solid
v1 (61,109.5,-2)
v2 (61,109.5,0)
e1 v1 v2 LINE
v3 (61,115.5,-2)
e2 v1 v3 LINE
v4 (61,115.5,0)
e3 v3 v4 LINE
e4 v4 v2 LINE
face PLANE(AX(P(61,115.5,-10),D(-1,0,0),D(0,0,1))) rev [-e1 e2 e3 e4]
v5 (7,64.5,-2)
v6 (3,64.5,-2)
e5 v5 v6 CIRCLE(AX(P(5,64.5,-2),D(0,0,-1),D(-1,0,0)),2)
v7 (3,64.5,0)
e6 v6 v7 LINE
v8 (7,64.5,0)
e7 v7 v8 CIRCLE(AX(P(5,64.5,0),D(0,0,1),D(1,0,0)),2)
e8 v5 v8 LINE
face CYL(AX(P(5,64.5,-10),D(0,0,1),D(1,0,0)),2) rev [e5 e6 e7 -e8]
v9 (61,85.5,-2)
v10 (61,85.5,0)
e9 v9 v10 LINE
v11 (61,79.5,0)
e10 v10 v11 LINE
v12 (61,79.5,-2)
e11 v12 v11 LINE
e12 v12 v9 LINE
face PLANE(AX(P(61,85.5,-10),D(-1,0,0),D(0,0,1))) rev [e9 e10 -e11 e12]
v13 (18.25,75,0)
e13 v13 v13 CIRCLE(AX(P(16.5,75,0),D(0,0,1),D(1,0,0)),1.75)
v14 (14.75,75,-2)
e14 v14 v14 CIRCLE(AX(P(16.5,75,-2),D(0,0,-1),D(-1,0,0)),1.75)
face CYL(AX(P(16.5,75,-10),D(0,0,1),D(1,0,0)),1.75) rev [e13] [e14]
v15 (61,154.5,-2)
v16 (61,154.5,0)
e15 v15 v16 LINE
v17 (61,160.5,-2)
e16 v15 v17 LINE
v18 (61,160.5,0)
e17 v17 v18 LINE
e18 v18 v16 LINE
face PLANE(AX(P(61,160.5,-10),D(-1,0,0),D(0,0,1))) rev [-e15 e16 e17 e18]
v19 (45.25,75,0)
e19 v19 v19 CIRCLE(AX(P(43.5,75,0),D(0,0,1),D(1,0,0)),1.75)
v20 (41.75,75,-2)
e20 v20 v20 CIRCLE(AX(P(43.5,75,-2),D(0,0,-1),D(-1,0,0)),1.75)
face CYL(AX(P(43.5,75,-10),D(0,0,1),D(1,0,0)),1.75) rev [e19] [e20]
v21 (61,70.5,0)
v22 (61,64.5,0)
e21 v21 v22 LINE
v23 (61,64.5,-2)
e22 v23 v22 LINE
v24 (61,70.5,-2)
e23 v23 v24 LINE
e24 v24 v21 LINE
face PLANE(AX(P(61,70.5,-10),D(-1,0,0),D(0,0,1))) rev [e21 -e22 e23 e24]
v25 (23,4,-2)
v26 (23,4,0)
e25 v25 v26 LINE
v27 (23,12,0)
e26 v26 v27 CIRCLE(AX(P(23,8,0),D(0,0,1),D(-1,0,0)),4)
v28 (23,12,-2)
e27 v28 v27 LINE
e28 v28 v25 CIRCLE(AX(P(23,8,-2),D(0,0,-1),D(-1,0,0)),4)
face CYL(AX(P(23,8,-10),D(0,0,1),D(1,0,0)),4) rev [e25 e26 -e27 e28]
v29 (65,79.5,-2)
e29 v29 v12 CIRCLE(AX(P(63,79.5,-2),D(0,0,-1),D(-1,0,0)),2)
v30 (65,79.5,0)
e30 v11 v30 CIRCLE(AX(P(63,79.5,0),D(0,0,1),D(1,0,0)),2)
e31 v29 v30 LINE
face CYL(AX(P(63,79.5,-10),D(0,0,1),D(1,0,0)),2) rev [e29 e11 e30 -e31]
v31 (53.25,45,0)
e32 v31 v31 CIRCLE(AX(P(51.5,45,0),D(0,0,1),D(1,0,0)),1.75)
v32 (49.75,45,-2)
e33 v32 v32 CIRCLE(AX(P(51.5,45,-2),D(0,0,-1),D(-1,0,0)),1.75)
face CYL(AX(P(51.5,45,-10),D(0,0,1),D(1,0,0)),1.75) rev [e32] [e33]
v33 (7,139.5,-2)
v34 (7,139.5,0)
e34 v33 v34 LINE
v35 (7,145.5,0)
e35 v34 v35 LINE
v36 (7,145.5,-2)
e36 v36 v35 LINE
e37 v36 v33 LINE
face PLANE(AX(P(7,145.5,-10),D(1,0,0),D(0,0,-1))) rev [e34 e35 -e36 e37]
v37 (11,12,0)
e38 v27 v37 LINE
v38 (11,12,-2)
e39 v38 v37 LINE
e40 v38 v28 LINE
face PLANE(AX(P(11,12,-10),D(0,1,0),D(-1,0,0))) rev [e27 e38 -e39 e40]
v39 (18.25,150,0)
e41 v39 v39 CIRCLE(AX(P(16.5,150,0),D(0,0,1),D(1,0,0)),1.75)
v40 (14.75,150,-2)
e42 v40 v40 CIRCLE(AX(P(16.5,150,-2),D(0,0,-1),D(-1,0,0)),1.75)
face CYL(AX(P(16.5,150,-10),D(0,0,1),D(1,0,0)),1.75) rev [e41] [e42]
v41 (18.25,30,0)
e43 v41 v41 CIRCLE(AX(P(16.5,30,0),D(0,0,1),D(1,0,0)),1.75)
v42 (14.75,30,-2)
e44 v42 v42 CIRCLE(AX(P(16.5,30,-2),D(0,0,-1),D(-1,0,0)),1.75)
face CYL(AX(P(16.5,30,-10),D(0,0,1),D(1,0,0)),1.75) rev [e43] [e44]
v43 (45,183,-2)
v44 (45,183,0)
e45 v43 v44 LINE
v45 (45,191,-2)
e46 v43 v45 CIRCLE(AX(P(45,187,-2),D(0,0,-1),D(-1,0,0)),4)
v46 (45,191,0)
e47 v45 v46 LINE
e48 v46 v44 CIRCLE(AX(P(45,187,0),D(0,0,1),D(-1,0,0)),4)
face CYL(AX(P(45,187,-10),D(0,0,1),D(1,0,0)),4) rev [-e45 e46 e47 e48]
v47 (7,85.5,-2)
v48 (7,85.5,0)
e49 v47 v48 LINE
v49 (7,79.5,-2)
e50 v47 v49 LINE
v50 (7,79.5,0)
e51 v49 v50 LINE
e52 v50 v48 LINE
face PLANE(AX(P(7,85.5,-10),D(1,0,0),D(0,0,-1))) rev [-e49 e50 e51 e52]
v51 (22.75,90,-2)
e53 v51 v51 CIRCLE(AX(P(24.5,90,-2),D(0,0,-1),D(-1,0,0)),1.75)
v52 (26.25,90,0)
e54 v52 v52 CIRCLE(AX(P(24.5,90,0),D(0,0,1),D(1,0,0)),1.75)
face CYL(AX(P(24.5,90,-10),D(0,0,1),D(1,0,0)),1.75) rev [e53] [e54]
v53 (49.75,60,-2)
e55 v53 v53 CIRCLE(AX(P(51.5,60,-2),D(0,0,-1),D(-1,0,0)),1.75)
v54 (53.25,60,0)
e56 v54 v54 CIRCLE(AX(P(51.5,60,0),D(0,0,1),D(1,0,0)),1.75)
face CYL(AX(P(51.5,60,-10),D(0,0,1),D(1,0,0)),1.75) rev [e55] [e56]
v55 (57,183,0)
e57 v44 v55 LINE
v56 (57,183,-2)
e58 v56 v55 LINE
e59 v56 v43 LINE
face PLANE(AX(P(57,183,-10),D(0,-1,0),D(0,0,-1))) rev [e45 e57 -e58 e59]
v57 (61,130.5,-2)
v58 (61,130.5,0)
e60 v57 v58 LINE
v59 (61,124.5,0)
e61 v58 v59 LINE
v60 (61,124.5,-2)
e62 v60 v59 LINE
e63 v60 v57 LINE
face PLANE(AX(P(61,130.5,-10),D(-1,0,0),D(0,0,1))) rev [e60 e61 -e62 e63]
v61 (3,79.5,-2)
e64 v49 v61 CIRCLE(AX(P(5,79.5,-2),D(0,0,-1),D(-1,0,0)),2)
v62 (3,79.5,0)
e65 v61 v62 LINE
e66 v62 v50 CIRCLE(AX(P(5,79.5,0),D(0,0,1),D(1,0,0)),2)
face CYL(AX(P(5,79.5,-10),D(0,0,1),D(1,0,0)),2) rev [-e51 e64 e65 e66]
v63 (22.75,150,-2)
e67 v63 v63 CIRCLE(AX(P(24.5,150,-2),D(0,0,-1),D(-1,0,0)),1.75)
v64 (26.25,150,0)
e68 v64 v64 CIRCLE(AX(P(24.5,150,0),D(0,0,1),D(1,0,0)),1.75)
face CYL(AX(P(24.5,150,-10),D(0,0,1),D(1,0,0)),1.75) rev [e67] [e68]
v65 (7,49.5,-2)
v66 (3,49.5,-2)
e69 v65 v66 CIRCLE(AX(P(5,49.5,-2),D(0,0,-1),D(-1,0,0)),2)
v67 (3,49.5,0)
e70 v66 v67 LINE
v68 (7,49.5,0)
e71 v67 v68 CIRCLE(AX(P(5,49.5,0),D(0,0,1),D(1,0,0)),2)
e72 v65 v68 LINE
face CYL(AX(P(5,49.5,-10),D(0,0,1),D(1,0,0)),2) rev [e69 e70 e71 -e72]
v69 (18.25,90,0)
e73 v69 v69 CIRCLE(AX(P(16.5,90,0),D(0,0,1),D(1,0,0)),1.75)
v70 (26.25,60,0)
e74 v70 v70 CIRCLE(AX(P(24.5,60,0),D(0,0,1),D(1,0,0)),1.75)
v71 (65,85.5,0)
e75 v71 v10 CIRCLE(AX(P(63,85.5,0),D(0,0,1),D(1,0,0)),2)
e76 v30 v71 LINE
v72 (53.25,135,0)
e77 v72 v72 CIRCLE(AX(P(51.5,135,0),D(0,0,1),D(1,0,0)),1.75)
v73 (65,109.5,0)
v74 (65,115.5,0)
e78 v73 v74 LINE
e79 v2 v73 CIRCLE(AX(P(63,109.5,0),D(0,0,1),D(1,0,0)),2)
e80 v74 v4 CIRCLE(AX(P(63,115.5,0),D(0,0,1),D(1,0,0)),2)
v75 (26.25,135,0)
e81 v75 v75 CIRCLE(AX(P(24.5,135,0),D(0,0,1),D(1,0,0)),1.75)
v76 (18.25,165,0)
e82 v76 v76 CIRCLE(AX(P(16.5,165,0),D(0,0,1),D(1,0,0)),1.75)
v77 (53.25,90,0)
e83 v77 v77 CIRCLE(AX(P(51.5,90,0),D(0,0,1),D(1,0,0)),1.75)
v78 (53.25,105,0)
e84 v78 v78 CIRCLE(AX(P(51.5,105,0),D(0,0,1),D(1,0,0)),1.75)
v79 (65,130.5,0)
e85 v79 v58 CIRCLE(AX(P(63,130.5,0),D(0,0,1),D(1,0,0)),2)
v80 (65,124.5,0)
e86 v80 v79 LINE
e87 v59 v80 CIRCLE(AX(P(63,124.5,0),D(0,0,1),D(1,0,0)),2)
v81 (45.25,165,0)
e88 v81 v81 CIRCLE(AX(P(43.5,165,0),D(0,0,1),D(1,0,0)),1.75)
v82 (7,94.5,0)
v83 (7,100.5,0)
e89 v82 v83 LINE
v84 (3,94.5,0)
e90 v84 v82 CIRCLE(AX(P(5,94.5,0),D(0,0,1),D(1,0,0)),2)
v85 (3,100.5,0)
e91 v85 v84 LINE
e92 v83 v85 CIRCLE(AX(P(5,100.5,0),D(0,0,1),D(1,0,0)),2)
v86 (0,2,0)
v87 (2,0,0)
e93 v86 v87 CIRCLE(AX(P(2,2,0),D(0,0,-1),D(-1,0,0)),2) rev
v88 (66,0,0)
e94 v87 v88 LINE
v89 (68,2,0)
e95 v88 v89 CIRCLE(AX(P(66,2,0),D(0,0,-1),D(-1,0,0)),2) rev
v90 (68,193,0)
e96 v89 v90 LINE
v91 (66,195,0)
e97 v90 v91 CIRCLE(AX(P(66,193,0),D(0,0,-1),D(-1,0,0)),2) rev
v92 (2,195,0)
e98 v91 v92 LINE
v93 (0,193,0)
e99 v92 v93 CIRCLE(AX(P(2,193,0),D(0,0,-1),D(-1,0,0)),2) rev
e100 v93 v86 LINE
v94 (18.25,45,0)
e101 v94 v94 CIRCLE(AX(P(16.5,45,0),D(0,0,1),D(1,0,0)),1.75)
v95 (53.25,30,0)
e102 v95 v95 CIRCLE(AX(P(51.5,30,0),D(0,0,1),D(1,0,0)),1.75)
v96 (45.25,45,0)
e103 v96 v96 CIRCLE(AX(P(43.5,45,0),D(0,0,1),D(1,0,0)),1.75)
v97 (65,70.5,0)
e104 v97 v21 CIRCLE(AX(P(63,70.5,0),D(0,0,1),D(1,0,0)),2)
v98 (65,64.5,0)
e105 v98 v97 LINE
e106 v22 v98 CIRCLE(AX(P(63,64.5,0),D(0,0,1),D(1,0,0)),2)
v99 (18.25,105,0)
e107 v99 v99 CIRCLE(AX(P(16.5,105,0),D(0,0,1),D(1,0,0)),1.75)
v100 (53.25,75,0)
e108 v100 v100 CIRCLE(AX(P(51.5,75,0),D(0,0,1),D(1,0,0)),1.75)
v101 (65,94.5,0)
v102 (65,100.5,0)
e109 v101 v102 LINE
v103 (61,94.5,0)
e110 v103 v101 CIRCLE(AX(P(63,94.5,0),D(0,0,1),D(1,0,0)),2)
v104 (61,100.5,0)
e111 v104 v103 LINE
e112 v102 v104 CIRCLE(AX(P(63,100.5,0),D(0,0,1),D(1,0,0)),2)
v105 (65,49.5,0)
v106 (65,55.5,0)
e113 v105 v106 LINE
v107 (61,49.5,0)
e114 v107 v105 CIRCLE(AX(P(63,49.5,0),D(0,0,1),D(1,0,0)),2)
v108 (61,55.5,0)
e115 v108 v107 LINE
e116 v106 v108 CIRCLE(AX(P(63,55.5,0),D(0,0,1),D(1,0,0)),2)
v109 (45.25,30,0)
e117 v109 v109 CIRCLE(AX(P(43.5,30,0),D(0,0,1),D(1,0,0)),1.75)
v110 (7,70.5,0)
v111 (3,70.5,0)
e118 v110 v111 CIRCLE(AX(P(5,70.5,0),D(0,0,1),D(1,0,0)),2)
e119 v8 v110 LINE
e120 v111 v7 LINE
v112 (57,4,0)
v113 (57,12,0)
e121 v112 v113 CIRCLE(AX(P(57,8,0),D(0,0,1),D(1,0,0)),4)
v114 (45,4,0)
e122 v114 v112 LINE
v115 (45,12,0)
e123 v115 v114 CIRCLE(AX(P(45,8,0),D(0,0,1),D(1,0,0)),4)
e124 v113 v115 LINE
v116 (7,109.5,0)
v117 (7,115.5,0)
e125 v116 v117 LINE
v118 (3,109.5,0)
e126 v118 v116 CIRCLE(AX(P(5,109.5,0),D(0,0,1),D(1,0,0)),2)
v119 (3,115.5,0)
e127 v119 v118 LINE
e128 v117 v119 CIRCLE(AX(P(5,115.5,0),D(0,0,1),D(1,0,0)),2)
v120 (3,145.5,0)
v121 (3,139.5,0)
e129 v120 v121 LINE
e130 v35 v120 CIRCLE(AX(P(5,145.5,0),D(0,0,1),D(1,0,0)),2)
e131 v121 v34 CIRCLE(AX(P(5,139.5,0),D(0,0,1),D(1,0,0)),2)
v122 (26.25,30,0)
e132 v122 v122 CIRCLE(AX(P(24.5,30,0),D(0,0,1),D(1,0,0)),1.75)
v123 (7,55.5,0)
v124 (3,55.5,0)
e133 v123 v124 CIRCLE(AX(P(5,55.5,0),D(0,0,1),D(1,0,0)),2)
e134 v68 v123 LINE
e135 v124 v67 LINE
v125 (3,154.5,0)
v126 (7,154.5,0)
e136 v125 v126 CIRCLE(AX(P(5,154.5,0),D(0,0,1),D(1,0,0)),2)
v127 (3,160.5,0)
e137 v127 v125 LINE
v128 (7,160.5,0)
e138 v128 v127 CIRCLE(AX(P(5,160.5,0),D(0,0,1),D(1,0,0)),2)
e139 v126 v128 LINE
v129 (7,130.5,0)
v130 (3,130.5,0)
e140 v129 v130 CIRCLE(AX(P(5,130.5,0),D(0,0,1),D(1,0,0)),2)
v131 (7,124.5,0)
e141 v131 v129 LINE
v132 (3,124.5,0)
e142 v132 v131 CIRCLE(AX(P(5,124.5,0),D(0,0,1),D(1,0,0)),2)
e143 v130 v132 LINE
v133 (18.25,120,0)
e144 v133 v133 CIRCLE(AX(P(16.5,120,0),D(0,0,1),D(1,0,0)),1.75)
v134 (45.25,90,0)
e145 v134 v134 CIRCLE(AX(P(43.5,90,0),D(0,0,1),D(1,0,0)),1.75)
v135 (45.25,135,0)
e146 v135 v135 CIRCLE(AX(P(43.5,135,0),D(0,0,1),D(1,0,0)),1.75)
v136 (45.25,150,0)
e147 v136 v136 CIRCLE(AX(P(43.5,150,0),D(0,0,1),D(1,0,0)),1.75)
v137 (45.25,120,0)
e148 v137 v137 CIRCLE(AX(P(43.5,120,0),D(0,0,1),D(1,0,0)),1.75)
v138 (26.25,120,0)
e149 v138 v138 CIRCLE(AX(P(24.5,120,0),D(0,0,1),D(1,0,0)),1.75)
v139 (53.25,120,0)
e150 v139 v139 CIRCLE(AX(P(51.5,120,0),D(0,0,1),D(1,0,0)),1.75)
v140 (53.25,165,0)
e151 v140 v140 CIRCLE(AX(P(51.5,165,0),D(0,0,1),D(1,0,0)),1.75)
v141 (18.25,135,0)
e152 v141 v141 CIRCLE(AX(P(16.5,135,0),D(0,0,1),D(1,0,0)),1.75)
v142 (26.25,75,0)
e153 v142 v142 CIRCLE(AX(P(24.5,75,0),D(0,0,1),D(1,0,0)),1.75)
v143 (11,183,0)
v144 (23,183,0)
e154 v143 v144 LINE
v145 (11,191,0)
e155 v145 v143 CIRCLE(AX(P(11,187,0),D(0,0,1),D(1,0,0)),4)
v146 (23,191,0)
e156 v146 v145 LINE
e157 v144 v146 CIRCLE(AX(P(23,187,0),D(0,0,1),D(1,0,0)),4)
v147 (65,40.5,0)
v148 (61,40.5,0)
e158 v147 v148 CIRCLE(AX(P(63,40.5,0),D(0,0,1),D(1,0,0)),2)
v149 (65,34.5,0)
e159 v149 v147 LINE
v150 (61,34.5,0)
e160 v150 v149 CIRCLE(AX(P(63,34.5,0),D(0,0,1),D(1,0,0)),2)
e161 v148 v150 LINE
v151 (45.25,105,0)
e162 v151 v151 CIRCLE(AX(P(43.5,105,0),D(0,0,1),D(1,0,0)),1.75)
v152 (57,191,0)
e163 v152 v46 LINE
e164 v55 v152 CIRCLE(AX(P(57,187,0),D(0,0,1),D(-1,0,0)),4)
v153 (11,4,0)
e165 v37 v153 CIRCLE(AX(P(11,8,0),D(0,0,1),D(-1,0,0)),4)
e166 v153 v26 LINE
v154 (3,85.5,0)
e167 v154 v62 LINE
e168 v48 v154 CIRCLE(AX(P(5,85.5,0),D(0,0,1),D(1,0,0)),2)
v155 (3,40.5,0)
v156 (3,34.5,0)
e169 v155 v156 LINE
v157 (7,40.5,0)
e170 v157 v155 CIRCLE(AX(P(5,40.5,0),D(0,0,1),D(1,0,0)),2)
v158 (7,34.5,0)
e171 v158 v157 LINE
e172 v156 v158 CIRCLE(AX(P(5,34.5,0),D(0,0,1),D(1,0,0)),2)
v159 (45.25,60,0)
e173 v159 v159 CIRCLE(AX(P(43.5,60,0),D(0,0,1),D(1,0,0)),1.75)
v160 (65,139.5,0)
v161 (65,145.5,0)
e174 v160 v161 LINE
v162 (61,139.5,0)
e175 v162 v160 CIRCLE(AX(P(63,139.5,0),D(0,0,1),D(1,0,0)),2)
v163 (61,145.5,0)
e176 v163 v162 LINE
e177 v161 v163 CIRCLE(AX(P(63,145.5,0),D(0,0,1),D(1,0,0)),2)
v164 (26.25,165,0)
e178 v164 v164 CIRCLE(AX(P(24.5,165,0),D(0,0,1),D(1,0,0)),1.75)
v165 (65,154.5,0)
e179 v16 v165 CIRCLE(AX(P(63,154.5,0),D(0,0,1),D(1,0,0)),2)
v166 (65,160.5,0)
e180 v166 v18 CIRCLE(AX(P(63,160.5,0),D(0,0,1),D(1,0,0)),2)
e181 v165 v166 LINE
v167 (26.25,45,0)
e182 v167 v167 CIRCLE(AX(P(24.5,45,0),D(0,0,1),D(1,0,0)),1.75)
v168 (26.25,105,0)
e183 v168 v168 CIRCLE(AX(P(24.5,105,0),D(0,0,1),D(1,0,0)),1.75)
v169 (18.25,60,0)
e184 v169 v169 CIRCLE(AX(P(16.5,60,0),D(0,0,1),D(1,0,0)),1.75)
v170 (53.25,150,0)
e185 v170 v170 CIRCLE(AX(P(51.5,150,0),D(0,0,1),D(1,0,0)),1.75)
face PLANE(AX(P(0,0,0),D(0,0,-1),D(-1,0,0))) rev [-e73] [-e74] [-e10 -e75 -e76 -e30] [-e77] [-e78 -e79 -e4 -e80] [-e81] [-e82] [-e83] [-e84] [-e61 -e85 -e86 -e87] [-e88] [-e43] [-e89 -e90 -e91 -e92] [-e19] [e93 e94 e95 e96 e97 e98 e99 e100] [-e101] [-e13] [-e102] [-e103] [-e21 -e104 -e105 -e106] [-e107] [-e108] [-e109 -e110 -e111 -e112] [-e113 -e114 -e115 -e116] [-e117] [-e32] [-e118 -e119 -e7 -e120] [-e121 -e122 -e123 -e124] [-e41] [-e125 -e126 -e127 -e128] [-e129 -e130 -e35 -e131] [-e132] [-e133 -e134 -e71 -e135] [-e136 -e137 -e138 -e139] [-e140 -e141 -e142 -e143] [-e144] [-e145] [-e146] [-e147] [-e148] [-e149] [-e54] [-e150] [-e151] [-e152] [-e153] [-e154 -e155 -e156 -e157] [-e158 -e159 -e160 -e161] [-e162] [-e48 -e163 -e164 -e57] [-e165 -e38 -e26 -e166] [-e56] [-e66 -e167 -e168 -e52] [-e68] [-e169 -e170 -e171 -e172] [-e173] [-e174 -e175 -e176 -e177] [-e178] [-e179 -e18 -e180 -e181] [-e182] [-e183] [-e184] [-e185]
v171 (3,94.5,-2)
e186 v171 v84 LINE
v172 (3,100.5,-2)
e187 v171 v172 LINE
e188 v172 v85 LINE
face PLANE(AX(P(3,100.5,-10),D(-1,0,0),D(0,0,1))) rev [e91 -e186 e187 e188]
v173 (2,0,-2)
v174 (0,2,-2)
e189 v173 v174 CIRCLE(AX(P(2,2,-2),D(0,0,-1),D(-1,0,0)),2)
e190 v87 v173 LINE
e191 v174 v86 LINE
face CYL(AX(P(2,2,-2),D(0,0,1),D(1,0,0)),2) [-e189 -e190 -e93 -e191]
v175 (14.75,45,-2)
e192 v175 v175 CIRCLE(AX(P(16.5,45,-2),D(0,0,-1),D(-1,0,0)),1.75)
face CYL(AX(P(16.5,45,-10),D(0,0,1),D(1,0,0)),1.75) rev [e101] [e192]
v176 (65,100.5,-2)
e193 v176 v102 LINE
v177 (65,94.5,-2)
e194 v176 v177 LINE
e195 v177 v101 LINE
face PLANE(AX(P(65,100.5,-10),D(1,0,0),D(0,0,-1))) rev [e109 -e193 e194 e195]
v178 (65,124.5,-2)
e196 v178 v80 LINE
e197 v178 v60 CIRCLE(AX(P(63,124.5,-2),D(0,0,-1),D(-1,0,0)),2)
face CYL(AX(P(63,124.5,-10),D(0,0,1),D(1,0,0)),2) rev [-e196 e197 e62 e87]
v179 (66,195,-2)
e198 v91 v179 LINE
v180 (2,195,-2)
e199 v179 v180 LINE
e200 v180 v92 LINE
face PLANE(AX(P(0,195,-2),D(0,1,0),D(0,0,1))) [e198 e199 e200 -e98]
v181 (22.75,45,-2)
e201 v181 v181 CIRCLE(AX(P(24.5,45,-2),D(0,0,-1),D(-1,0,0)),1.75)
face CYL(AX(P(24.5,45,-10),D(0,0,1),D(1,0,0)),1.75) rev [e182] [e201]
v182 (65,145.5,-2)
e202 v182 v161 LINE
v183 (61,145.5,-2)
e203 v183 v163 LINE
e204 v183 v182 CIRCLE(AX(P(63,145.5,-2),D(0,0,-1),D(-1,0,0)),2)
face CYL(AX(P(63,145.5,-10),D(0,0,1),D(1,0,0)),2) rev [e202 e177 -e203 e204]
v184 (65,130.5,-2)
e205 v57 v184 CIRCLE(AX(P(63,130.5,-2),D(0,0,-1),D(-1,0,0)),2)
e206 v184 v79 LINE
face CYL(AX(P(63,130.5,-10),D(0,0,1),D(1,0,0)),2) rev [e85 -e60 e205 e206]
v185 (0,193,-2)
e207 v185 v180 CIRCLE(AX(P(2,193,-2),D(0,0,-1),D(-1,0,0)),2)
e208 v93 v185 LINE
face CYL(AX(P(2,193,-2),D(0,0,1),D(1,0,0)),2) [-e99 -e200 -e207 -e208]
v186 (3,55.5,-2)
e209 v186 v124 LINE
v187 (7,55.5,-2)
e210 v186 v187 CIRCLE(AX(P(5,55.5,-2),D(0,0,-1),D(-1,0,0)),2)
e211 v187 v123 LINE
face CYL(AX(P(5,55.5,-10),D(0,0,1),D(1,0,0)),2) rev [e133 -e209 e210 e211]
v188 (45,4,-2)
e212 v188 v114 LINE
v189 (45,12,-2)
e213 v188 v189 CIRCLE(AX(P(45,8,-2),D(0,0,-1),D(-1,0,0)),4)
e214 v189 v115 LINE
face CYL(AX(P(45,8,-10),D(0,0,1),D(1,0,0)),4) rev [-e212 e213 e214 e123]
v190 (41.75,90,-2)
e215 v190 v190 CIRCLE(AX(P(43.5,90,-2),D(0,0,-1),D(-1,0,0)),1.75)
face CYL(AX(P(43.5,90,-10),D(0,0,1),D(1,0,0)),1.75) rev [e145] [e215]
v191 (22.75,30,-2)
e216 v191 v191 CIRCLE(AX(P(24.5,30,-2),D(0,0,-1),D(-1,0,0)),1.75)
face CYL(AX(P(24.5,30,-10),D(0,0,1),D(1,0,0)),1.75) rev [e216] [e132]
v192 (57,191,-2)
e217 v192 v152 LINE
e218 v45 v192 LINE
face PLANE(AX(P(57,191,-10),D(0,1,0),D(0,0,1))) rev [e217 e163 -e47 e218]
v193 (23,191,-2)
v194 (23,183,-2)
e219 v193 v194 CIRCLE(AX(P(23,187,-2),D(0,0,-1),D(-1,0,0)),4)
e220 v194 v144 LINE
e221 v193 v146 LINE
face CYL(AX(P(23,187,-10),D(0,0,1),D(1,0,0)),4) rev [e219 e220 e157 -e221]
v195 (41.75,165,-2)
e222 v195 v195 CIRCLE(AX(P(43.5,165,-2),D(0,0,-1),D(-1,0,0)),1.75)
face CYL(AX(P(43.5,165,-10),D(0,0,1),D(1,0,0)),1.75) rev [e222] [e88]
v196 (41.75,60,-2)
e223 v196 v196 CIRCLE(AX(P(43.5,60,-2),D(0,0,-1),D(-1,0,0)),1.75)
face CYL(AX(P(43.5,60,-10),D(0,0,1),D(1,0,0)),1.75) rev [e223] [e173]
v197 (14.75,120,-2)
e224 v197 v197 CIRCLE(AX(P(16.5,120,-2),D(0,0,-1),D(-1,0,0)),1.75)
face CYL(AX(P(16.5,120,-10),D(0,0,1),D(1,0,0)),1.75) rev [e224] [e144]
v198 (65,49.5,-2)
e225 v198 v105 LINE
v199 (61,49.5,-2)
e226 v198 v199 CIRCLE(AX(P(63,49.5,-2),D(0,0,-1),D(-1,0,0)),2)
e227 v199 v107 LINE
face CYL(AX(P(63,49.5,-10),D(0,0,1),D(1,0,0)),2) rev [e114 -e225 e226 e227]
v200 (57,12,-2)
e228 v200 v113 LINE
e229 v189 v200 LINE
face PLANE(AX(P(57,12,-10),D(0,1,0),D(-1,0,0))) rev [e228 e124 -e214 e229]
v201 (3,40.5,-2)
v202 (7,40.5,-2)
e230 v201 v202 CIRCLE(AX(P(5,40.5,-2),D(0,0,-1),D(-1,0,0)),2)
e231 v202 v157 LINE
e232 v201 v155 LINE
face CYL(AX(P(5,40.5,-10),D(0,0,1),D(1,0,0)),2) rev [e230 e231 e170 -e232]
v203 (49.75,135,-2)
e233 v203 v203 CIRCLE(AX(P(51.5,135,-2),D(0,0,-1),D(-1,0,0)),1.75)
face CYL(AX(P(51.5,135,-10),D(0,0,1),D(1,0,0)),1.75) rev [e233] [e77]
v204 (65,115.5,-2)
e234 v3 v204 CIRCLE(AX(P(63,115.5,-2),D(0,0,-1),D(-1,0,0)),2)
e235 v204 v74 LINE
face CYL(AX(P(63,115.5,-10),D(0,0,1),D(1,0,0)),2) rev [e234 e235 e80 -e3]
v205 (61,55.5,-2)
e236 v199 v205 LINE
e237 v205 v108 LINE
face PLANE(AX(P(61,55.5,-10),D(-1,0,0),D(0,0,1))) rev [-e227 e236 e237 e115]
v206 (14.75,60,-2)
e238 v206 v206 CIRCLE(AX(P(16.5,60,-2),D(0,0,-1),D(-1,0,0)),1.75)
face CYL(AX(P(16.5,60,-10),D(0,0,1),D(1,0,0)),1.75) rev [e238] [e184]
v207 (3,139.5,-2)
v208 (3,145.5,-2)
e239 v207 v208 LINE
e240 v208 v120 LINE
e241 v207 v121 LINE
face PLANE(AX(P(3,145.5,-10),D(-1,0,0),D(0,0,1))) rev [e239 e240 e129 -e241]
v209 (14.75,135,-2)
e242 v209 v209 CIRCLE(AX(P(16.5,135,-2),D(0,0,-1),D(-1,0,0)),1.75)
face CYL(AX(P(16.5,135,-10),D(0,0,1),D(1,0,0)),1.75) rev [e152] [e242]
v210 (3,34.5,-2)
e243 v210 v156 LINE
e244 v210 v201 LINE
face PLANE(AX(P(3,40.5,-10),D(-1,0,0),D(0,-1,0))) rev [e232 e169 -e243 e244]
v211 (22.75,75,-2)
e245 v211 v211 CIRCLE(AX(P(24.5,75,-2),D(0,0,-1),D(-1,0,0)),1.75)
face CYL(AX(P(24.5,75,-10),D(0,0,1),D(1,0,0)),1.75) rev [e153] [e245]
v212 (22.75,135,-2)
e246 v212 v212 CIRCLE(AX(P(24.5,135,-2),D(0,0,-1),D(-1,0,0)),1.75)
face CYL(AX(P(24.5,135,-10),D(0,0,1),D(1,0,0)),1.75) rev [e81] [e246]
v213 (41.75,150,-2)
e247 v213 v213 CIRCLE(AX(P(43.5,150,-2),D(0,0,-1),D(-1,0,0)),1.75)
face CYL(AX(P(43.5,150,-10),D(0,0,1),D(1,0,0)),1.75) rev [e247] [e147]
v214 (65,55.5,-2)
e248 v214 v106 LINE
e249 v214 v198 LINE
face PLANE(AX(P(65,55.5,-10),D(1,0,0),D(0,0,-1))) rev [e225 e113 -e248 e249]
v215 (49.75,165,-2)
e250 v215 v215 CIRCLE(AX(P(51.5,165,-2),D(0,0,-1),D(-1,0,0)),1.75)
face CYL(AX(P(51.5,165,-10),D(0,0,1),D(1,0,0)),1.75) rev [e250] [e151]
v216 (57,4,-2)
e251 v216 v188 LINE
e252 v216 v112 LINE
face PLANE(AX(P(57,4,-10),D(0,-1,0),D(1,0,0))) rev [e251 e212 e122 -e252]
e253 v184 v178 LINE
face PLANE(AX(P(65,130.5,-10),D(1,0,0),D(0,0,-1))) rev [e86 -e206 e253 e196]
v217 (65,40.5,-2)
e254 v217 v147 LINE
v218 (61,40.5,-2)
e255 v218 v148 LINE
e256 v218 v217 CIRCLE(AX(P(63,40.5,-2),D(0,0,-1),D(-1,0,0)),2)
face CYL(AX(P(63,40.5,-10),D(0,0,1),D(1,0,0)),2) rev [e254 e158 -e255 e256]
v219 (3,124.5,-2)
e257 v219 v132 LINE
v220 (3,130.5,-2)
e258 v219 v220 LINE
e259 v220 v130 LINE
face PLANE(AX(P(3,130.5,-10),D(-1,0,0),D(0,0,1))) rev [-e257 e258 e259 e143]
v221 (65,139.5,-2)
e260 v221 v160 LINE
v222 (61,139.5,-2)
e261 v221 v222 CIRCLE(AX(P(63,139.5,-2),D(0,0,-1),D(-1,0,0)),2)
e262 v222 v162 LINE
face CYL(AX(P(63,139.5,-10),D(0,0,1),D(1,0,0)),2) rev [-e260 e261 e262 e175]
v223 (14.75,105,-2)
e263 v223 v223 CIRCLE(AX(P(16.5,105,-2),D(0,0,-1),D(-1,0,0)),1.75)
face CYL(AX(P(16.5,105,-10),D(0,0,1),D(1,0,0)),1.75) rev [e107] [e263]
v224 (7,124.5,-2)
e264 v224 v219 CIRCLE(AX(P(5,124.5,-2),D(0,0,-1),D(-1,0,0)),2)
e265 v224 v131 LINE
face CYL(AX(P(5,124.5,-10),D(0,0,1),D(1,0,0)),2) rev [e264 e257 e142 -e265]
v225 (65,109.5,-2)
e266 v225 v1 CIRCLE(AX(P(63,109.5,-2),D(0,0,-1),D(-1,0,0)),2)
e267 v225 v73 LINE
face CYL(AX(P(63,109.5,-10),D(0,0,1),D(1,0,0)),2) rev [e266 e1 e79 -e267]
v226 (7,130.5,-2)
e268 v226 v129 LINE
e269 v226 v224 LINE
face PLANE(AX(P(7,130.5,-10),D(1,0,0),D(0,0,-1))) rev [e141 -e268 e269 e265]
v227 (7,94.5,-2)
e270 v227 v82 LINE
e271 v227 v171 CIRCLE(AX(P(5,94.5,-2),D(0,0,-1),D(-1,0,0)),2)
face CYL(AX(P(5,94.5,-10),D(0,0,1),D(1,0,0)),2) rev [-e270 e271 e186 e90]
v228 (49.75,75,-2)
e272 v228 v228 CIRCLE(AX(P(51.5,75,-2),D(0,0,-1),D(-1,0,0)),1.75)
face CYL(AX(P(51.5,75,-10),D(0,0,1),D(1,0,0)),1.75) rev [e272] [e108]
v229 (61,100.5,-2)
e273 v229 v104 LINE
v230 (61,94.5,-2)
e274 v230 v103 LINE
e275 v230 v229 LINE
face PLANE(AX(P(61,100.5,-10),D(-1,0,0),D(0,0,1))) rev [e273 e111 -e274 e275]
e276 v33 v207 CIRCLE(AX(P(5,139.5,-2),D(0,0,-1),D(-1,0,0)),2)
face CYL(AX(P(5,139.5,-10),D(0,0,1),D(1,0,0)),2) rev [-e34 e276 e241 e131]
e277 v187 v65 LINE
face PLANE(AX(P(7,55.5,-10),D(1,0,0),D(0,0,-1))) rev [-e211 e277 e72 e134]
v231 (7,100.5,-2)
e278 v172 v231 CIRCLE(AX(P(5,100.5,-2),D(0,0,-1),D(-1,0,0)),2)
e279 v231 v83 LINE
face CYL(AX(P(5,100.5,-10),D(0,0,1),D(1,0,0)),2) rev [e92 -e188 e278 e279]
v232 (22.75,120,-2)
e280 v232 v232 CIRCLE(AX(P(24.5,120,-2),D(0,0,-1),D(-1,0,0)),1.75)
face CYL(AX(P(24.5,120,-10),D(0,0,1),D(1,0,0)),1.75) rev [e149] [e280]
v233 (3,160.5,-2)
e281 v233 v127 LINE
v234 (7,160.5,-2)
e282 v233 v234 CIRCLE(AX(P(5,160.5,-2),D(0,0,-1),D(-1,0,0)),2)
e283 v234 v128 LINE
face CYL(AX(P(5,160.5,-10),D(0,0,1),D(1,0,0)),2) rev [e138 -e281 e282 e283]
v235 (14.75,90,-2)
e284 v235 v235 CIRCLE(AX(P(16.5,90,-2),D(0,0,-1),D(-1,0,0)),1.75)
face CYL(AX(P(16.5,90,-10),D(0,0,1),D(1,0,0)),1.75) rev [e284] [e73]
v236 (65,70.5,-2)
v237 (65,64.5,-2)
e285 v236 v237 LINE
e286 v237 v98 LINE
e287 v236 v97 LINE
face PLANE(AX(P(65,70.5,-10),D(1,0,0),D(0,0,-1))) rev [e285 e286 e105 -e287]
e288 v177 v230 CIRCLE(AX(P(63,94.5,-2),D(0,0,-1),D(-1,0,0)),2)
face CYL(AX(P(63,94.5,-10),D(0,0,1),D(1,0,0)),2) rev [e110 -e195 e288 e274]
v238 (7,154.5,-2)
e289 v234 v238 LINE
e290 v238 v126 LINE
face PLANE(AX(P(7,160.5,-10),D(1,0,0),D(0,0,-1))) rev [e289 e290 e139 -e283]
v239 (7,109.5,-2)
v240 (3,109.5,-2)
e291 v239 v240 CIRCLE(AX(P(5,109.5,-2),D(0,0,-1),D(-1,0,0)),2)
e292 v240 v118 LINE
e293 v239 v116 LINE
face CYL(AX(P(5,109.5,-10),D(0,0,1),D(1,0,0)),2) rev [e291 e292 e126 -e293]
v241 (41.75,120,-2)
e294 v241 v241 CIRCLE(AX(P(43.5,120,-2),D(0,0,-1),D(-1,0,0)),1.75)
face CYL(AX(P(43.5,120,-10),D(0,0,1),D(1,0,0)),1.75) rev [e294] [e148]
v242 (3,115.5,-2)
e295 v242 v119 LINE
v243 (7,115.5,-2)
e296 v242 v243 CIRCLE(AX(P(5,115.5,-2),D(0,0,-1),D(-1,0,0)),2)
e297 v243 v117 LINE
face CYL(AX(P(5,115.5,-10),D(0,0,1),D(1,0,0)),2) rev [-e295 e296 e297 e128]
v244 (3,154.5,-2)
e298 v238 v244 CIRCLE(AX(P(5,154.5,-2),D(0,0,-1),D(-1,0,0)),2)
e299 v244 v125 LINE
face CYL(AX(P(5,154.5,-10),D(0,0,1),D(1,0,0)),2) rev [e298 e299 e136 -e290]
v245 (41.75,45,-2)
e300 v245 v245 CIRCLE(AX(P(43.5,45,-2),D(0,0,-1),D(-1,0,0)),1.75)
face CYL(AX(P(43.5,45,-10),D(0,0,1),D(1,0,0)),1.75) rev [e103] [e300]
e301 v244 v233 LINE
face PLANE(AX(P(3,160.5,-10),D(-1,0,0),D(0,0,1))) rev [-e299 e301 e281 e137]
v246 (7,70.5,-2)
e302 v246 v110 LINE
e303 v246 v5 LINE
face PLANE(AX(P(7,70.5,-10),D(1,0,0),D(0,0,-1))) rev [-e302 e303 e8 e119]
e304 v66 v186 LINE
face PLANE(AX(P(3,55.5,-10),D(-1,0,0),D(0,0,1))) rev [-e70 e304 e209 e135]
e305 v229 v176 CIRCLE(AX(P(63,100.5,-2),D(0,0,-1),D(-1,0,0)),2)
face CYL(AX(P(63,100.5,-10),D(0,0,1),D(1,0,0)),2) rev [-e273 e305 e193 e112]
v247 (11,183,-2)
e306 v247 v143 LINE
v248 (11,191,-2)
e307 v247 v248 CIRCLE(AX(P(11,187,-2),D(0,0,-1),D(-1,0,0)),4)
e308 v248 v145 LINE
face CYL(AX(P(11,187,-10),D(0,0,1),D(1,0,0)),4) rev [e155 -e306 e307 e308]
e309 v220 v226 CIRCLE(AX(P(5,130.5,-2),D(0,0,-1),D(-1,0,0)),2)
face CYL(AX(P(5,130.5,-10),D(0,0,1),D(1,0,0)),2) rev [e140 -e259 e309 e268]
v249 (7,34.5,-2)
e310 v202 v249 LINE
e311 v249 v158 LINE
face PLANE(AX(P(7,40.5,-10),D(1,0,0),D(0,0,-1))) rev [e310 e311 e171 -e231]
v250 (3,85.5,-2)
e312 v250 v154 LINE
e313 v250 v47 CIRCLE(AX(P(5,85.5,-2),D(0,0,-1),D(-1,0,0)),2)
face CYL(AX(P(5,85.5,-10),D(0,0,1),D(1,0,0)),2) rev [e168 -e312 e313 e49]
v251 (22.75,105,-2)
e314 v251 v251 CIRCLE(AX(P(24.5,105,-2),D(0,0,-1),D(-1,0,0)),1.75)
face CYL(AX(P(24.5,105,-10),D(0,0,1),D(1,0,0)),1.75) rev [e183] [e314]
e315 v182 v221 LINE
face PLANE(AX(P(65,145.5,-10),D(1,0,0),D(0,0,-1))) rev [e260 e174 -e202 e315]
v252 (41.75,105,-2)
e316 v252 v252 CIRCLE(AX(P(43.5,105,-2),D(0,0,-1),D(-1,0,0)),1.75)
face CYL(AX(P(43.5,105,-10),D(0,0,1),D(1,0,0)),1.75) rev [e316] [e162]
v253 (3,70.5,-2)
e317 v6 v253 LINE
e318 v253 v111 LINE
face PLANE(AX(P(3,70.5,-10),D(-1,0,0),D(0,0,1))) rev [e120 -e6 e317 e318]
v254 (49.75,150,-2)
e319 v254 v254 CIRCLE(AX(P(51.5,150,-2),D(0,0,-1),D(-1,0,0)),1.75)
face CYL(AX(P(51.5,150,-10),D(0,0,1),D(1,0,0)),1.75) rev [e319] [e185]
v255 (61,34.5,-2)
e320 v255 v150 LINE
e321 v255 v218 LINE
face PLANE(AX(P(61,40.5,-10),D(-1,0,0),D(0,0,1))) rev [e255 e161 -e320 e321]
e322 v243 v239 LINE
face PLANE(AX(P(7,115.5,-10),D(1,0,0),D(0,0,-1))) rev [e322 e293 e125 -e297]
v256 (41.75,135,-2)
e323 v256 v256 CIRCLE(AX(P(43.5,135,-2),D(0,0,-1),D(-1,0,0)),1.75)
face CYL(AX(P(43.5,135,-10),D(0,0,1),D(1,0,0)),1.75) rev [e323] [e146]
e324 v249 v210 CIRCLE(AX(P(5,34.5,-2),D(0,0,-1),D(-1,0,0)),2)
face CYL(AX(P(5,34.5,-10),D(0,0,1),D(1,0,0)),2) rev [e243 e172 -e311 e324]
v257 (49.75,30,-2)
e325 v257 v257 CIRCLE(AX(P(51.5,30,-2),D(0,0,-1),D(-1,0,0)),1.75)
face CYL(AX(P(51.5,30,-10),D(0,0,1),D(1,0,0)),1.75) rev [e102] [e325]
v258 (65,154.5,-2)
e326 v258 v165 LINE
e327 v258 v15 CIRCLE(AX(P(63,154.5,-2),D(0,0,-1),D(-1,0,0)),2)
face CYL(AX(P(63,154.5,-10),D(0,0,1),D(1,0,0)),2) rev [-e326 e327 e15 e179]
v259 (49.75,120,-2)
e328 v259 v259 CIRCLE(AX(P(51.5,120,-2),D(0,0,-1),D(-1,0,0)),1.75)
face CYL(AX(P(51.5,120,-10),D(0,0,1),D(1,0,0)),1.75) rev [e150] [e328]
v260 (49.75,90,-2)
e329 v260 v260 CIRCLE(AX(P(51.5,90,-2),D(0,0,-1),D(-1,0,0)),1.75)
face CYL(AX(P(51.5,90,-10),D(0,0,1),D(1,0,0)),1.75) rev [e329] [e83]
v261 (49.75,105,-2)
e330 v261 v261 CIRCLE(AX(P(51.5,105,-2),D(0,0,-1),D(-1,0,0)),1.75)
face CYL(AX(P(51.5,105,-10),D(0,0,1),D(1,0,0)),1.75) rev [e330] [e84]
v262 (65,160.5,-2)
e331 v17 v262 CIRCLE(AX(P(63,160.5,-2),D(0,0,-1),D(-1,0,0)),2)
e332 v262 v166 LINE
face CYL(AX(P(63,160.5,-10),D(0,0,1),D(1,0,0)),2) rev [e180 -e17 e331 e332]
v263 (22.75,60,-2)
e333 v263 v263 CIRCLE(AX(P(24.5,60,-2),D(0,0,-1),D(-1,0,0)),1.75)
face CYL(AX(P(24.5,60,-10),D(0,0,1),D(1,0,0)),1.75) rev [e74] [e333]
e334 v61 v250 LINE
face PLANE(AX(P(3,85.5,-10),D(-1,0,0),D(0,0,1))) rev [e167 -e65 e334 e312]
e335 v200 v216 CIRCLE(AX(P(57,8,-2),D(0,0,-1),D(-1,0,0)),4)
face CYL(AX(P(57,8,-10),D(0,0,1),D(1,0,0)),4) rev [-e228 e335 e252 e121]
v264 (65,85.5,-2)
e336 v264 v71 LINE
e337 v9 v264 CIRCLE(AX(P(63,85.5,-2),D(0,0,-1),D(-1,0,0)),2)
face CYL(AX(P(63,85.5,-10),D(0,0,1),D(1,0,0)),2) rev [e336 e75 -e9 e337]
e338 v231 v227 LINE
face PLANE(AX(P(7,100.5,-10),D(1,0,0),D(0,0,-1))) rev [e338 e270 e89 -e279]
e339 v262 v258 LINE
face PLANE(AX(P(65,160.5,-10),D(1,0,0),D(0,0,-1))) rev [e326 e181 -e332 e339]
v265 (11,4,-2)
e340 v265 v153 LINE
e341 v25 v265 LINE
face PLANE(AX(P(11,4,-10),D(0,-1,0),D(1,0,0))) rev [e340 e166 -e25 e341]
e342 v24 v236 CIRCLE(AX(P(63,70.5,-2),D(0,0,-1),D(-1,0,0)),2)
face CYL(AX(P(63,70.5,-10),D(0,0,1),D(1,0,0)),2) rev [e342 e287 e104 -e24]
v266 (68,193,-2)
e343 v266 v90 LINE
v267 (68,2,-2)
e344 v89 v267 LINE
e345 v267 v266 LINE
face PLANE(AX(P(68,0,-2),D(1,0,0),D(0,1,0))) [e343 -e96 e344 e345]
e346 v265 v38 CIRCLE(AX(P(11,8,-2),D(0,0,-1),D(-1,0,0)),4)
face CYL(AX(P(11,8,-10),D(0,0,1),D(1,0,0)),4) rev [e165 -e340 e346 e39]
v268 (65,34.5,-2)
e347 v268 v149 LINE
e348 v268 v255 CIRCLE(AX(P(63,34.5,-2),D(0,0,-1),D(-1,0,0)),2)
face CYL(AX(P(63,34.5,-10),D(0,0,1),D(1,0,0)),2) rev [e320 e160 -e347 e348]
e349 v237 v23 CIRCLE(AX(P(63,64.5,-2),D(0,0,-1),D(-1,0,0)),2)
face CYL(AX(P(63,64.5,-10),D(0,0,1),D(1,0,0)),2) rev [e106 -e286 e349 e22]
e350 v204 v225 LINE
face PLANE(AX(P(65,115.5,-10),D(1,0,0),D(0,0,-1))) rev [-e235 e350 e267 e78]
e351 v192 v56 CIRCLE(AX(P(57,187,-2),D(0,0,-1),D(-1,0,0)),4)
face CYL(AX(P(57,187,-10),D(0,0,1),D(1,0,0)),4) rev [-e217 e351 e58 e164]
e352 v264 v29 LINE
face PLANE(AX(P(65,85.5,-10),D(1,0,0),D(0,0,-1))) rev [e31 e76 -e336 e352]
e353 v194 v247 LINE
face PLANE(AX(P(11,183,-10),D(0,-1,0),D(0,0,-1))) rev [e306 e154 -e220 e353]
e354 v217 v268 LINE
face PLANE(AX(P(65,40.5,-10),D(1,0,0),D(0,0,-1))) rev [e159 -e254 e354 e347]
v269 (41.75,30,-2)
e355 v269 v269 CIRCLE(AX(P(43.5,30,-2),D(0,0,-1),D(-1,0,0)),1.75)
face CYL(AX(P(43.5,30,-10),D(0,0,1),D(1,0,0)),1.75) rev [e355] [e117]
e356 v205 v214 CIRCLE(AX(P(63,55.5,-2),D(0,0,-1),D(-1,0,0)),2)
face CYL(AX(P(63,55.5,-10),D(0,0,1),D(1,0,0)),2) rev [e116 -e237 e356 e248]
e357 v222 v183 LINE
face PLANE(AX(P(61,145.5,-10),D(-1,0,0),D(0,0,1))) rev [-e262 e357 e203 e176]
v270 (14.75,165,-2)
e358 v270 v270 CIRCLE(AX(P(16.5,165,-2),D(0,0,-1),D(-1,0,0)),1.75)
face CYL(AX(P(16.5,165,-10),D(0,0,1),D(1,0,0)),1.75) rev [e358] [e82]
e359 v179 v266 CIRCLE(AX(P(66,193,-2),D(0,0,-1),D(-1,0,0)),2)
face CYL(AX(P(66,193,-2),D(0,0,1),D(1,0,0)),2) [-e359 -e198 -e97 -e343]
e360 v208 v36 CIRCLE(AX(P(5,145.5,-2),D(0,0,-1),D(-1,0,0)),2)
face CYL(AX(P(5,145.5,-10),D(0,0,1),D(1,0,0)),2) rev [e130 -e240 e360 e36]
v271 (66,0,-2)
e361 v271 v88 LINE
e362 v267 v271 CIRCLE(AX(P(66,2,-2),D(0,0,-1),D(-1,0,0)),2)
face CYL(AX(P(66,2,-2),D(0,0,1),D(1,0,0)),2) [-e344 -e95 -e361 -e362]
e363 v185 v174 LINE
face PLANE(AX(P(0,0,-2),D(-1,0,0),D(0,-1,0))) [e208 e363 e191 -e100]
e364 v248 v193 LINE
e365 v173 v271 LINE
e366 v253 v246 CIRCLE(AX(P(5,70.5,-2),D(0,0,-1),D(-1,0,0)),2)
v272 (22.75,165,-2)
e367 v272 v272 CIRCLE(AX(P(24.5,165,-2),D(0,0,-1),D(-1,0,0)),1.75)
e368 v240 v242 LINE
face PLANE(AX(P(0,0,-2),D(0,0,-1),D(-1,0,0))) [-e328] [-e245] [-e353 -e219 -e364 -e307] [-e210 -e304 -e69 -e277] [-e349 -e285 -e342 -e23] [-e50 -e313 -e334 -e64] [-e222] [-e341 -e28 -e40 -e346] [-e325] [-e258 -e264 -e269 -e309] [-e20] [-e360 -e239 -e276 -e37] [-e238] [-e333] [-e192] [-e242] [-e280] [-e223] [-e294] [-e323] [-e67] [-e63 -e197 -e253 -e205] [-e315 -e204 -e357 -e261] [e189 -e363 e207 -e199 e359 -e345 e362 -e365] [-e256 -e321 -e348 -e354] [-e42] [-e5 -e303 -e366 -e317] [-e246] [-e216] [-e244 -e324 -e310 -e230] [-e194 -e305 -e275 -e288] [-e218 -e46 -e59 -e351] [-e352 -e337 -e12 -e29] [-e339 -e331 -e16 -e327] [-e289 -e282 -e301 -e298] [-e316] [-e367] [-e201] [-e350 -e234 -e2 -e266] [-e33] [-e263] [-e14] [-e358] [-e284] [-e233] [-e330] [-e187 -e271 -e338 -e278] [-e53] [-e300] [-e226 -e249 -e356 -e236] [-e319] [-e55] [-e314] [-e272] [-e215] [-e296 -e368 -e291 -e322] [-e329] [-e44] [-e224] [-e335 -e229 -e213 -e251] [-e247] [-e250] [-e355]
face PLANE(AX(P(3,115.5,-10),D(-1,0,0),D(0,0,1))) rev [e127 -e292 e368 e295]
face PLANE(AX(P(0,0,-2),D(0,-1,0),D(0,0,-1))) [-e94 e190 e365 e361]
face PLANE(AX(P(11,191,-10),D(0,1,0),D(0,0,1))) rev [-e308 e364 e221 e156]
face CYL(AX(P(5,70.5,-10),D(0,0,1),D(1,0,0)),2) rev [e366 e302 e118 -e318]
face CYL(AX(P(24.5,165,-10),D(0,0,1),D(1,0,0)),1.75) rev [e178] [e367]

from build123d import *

# Parameters (mm, degrees)
ESBO_O1_W             = 68
ESBO_O1_H             = 195
FLANGE_BASE1_DEPTH    = 2
FILETE1_R             = 2
ESBO_O2_R             = 1.75
CORTE_EXTRUS_O1_DEPTH = 10


# Sheet-metal steps are written as plain solids
with BuildPart() as part:
    # Esboço1 → Flange-base1 (new body)
    with BuildSketch(Plane.XY):
        with Locations((34, 97.5)):
            Rectangle(ESBO_O1_W, ESBO_O1_H)
    extrude(amount=-FLANGE_BASE1_DEPTH)

    # Filete1
    filete1_edges = [part.edges().sort_by_distance(p)[0] for p in [
        (0, 195, -1),
        (68, 195, -1),
        (68, 0, -1),
        (0, 0, -1),
    ]]
    fillet(filete1_edges, radius=FILETE1_R)

    # Esboço2 → Corte-extrusão1 (cut)
    with BuildSketch(Plane.XY):
        with Locations((16.5, 165)):
            Circle(ESBO_O2_R)
        with Locations((24.5, 165)):
            Circle(ESBO_O2_R)
        with Locations((43.5, 165)):
            Circle(ESBO_O2_R)
        with Locations((51.5, 165)):
            Circle(ESBO_O2_R)
        with Locations((43.5, 150)):
            Circle(ESBO_O2_R)
        with Locations((51.5, 150)):
            Circle(ESBO_O2_R)
        with Locations((43.5, 135)):
            Circle(ESBO_O2_R)
        with Locations((51.5, 135)):
            Circle(ESBO_O2_R)
        with Locations((43.5, 120)):
            Circle(ESBO_O2_R)
        with Locations((51.5, 120)):
            Circle(ESBO_O2_R)
        with Locations((43.5, 105)):
            Circle(ESBO_O2_R)
        with Locations((51.5, 105)):
            Circle(ESBO_O2_R)
        with Locations((16.5, 150)):
            Circle(ESBO_O2_R)
        with Locations((24.5, 150)):
            Circle(ESBO_O2_R)
        with Locations((16.5, 135)):
            Circle(ESBO_O2_R)
        with Locations((24.5, 135)):
            Circle(ESBO_O2_R)
        with Locations((16.5, 120)):
            Circle(ESBO_O2_R)
        with Locations((24.5, 120)):
            Circle(ESBO_O2_R)
        with Locations((16.5, 105)):
            Circle(ESBO_O2_R)
        with Locations((24.5, 105)):
            Circle(ESBO_O2_R)
        with Locations((16.5, 90)):
            Circle(ESBO_O2_R)
        with Locations((24.5, 90)):
            Circle(ESBO_O2_R)
        with Locations((43.5, 90)):
            Circle(ESBO_O2_R)
        with Locations((51.5, 90)):
            Circle(ESBO_O2_R)
        with Locations((16.5, 75)):
            Circle(ESBO_O2_R)
        with Locations((24.5, 75)):
            Circle(ESBO_O2_R)
        with Locations((43.5, 75)):
            Circle(ESBO_O2_R)
        with Locations((51.5, 75)):
            Circle(ESBO_O2_R)
        with Locations((16.5, 60)):
            Circle(ESBO_O2_R)
        with Locations((24.5, 60)):
            Circle(ESBO_O2_R)
        with Locations((43.5, 60)):
            Circle(ESBO_O2_R)
        with Locations((51.5, 60)):
            Circle(ESBO_O2_R)
        with Locations((16.5, 45)):
            Circle(ESBO_O2_R)
        with Locations((24.5, 45)):
            Circle(ESBO_O2_R)
        with Locations((43.5, 45)):
            Circle(ESBO_O2_R)
        with Locations((51.5, 45)):
            Circle(ESBO_O2_R)
        with Locations((16.5, 30)):
            Circle(ESBO_O2_R)
        with Locations((24.5, 30)):
            Circle(ESBO_O2_R)
        with Locations((43.5, 30)):
            Circle(ESBO_O2_R)
        with Locations((51.5, 30)):
            Circle(ESBO_O2_R)
        with BuildLine():
            Line((11, 191), (23, 191))
            ThreePointArc((23, 191), (27, 187), (23, 183))
            Line((23, 183), (11, 183))
            ThreePointArc((11, 183), (7, 187), (11, 191))
        make_face()
        with BuildLine():
            Line((57, 191), (45, 191))
            ThreePointArc((45, 191), (41, 187), (45, 183))
            Line((45, 183), (57, 183))
            ThreePointArc((57, 183), (61, 187), (57, 191))
        make_face()
        with BuildLine():
            Line((11, 4), (23, 4))
            ThreePointArc((23, 4), (27, 8), (23, 12))
            Line((23, 12), (11, 12))
            ThreePointArc((11, 12), (7, 8), (11, 4))
        make_face()
        with BuildLine():
            Line((57, 4), (45, 4))
            ThreePointArc((45, 4), (41, 8), (45, 12))
            Line((45, 12), (57, 12))
            ThreePointArc((57, 12), (61, 8), (57, 4))
        make_face()
        with BuildLine():
            Line((7, 160.5), (7, 154.5))
            ThreePointArc((7, 154.5), (5, 152.5), (3, 154.5))
            Line((3, 154.5), (3, 160.5))
            ThreePointArc((3, 160.5), (5, 162.5), (7, 160.5))
        make_face()
        with BuildLine():
            Line((65, 160.5), (65, 154.5))
            ThreePointArc((65, 154.5), (63, 152.5), (61, 154.5))
            Line((61, 154.5), (61, 160.5))
            ThreePointArc((61, 160.5), (63, 162.5), (65, 160.5))
        make_face()
        with BuildLine():
            Line((65, 145.5), (65, 139.5))
            ThreePointArc((65, 139.5), (63, 137.5), (61, 139.5))
            Line((61, 139.5), (61, 145.5))
            ThreePointArc((61, 145.5), (63, 147.5), (65, 145.5))
        make_face()
        with BuildLine():
            Line((65, 130.5), (65, 124.5))
            ThreePointArc((65, 124.5), (63, 122.5), (61, 124.5))
            Line((61, 124.5), (61, 130.5))
            ThreePointArc((61, 130.5), (63, 132.5), (65, 130.5))
        make_face()
        with BuildLine():
            Line((65, 115.5), (65, 109.5))
            ThreePointArc((65, 109.5), (63, 107.5), (61, 109.5))
            Line((61, 109.5), (61, 115.5))
            ThreePointArc((61, 115.5), (63, 117.5), (65, 115.5))
        make_face()
        with BuildLine():
            Line((65, 100.5), (65, 94.5))
            ThreePointArc((65, 94.5), (63, 92.5), (61, 94.5))
            Line((61, 94.5), (61, 100.5))
            ThreePointArc((61, 100.5), (63, 102.5), (65, 100.5))
        make_face()
        with BuildLine():
            Line((65, 85.5), (65, 79.5))
            ThreePointArc((65, 79.5), (63, 77.5), (61, 79.5))
            Line((61, 79.5), (61, 85.5))
            ThreePointArc((61, 85.5), (63, 87.5), (65, 85.5))
        make_face()
        with BuildLine():
            Line((65, 70.5), (65, 64.5))
            ThreePointArc((65, 64.5), (63, 62.5), (61, 64.5))
            Line((61, 64.5), (61, 70.5))
            ThreePointArc((61, 70.5), (63, 72.5), (65, 70.5))
        make_face()
        with BuildLine():
            Line((65, 55.5), (65, 49.5))
            ThreePointArc((65, 49.5), (63, 47.5), (61, 49.5))
            Line((61, 49.5), (61, 55.5))
            ThreePointArc((61, 55.5), (63, 57.5), (65, 55.5))
        make_face()
        with BuildLine():
            Line((7, 145.5), (7, 139.5))
            ThreePointArc((7, 139.5), (5, 137.5), (3, 139.5))
            Line((3, 139.5), (3, 145.5))
            ThreePointArc((3, 145.5), (5, 147.5), (7, 145.5))
        make_face()
        with BuildLine():
            Line((7, 130.5), (7, 124.5))
            ThreePointArc((7, 124.5), (5, 122.5), (3, 124.5))
            Line((3, 124.5), (3, 130.5))
            ThreePointArc((3, 130.5), (5, 132.5), (7, 130.5))
        make_face()
        with BuildLine():
            Line((7, 115.5), (7, 109.5))
            ThreePointArc((7, 109.5), (5, 107.5), (3, 109.5))
            Line((3, 109.5), (3, 115.5))
            ThreePointArc((3, 115.5), (5, 117.5), (7, 115.5))
        make_face()
        with BuildLine():
            Line((7, 100.5), (7, 94.5))
            ThreePointArc((7, 94.5), (5, 92.5), (3, 94.5))
            Line((3, 94.5), (3, 100.5))
            ThreePointArc((3, 100.5), (5, 102.5), (7, 100.5))
        make_face()
        with BuildLine():
            Line((7, 85.5), (7, 79.5))
            ThreePointArc((7, 79.5), (5, 77.5), (3, 79.5))
            Line((3, 79.5), (3, 85.5))
            ThreePointArc((3, 85.5), (5, 87.5), (7, 85.5))
        make_face()
        with BuildLine():
            Line((7, 70.5), (7, 64.5))
            ThreePointArc((7, 64.5), (5, 62.5), (3, 64.5))
            Line((3, 64.5), (3, 70.5))
            ThreePointArc((3, 70.5), (5, 72.5), (7, 70.5))
        make_face()
        with BuildLine():
            Line((7, 55.5), (7, 49.5))
            ThreePointArc((7, 49.5), (5, 47.5), (3, 49.5))
            Line((3, 49.5), (3, 55.5))
            ThreePointArc((3, 55.5), (5, 57.5), (7, 55.5))
        make_face()
        with BuildLine():
            Line((7, 40.5), (7, 34.5))
            ThreePointArc((7, 34.5), (5, 32.5), (3, 34.5))
            Line((3, 34.5), (3, 40.5))
            ThreePointArc((3, 40.5), (5, 42.5), (7, 40.5))
        make_face()
        with BuildLine():
            Line((65, 40.5), (65, 34.5))
            ThreePointArc((65, 34.5), (63, 32.5), (61, 34.5))
            Line((61, 34.5), (61, 40.5))
            ThreePointArc((61, 40.5), (63, 42.5), (65, 40.5))
        make_face()
    extrude(amount=-CORTE_EXTRUS_O1_DEPTH, mode=Mode.SUBTRACT)


solid = part.part
